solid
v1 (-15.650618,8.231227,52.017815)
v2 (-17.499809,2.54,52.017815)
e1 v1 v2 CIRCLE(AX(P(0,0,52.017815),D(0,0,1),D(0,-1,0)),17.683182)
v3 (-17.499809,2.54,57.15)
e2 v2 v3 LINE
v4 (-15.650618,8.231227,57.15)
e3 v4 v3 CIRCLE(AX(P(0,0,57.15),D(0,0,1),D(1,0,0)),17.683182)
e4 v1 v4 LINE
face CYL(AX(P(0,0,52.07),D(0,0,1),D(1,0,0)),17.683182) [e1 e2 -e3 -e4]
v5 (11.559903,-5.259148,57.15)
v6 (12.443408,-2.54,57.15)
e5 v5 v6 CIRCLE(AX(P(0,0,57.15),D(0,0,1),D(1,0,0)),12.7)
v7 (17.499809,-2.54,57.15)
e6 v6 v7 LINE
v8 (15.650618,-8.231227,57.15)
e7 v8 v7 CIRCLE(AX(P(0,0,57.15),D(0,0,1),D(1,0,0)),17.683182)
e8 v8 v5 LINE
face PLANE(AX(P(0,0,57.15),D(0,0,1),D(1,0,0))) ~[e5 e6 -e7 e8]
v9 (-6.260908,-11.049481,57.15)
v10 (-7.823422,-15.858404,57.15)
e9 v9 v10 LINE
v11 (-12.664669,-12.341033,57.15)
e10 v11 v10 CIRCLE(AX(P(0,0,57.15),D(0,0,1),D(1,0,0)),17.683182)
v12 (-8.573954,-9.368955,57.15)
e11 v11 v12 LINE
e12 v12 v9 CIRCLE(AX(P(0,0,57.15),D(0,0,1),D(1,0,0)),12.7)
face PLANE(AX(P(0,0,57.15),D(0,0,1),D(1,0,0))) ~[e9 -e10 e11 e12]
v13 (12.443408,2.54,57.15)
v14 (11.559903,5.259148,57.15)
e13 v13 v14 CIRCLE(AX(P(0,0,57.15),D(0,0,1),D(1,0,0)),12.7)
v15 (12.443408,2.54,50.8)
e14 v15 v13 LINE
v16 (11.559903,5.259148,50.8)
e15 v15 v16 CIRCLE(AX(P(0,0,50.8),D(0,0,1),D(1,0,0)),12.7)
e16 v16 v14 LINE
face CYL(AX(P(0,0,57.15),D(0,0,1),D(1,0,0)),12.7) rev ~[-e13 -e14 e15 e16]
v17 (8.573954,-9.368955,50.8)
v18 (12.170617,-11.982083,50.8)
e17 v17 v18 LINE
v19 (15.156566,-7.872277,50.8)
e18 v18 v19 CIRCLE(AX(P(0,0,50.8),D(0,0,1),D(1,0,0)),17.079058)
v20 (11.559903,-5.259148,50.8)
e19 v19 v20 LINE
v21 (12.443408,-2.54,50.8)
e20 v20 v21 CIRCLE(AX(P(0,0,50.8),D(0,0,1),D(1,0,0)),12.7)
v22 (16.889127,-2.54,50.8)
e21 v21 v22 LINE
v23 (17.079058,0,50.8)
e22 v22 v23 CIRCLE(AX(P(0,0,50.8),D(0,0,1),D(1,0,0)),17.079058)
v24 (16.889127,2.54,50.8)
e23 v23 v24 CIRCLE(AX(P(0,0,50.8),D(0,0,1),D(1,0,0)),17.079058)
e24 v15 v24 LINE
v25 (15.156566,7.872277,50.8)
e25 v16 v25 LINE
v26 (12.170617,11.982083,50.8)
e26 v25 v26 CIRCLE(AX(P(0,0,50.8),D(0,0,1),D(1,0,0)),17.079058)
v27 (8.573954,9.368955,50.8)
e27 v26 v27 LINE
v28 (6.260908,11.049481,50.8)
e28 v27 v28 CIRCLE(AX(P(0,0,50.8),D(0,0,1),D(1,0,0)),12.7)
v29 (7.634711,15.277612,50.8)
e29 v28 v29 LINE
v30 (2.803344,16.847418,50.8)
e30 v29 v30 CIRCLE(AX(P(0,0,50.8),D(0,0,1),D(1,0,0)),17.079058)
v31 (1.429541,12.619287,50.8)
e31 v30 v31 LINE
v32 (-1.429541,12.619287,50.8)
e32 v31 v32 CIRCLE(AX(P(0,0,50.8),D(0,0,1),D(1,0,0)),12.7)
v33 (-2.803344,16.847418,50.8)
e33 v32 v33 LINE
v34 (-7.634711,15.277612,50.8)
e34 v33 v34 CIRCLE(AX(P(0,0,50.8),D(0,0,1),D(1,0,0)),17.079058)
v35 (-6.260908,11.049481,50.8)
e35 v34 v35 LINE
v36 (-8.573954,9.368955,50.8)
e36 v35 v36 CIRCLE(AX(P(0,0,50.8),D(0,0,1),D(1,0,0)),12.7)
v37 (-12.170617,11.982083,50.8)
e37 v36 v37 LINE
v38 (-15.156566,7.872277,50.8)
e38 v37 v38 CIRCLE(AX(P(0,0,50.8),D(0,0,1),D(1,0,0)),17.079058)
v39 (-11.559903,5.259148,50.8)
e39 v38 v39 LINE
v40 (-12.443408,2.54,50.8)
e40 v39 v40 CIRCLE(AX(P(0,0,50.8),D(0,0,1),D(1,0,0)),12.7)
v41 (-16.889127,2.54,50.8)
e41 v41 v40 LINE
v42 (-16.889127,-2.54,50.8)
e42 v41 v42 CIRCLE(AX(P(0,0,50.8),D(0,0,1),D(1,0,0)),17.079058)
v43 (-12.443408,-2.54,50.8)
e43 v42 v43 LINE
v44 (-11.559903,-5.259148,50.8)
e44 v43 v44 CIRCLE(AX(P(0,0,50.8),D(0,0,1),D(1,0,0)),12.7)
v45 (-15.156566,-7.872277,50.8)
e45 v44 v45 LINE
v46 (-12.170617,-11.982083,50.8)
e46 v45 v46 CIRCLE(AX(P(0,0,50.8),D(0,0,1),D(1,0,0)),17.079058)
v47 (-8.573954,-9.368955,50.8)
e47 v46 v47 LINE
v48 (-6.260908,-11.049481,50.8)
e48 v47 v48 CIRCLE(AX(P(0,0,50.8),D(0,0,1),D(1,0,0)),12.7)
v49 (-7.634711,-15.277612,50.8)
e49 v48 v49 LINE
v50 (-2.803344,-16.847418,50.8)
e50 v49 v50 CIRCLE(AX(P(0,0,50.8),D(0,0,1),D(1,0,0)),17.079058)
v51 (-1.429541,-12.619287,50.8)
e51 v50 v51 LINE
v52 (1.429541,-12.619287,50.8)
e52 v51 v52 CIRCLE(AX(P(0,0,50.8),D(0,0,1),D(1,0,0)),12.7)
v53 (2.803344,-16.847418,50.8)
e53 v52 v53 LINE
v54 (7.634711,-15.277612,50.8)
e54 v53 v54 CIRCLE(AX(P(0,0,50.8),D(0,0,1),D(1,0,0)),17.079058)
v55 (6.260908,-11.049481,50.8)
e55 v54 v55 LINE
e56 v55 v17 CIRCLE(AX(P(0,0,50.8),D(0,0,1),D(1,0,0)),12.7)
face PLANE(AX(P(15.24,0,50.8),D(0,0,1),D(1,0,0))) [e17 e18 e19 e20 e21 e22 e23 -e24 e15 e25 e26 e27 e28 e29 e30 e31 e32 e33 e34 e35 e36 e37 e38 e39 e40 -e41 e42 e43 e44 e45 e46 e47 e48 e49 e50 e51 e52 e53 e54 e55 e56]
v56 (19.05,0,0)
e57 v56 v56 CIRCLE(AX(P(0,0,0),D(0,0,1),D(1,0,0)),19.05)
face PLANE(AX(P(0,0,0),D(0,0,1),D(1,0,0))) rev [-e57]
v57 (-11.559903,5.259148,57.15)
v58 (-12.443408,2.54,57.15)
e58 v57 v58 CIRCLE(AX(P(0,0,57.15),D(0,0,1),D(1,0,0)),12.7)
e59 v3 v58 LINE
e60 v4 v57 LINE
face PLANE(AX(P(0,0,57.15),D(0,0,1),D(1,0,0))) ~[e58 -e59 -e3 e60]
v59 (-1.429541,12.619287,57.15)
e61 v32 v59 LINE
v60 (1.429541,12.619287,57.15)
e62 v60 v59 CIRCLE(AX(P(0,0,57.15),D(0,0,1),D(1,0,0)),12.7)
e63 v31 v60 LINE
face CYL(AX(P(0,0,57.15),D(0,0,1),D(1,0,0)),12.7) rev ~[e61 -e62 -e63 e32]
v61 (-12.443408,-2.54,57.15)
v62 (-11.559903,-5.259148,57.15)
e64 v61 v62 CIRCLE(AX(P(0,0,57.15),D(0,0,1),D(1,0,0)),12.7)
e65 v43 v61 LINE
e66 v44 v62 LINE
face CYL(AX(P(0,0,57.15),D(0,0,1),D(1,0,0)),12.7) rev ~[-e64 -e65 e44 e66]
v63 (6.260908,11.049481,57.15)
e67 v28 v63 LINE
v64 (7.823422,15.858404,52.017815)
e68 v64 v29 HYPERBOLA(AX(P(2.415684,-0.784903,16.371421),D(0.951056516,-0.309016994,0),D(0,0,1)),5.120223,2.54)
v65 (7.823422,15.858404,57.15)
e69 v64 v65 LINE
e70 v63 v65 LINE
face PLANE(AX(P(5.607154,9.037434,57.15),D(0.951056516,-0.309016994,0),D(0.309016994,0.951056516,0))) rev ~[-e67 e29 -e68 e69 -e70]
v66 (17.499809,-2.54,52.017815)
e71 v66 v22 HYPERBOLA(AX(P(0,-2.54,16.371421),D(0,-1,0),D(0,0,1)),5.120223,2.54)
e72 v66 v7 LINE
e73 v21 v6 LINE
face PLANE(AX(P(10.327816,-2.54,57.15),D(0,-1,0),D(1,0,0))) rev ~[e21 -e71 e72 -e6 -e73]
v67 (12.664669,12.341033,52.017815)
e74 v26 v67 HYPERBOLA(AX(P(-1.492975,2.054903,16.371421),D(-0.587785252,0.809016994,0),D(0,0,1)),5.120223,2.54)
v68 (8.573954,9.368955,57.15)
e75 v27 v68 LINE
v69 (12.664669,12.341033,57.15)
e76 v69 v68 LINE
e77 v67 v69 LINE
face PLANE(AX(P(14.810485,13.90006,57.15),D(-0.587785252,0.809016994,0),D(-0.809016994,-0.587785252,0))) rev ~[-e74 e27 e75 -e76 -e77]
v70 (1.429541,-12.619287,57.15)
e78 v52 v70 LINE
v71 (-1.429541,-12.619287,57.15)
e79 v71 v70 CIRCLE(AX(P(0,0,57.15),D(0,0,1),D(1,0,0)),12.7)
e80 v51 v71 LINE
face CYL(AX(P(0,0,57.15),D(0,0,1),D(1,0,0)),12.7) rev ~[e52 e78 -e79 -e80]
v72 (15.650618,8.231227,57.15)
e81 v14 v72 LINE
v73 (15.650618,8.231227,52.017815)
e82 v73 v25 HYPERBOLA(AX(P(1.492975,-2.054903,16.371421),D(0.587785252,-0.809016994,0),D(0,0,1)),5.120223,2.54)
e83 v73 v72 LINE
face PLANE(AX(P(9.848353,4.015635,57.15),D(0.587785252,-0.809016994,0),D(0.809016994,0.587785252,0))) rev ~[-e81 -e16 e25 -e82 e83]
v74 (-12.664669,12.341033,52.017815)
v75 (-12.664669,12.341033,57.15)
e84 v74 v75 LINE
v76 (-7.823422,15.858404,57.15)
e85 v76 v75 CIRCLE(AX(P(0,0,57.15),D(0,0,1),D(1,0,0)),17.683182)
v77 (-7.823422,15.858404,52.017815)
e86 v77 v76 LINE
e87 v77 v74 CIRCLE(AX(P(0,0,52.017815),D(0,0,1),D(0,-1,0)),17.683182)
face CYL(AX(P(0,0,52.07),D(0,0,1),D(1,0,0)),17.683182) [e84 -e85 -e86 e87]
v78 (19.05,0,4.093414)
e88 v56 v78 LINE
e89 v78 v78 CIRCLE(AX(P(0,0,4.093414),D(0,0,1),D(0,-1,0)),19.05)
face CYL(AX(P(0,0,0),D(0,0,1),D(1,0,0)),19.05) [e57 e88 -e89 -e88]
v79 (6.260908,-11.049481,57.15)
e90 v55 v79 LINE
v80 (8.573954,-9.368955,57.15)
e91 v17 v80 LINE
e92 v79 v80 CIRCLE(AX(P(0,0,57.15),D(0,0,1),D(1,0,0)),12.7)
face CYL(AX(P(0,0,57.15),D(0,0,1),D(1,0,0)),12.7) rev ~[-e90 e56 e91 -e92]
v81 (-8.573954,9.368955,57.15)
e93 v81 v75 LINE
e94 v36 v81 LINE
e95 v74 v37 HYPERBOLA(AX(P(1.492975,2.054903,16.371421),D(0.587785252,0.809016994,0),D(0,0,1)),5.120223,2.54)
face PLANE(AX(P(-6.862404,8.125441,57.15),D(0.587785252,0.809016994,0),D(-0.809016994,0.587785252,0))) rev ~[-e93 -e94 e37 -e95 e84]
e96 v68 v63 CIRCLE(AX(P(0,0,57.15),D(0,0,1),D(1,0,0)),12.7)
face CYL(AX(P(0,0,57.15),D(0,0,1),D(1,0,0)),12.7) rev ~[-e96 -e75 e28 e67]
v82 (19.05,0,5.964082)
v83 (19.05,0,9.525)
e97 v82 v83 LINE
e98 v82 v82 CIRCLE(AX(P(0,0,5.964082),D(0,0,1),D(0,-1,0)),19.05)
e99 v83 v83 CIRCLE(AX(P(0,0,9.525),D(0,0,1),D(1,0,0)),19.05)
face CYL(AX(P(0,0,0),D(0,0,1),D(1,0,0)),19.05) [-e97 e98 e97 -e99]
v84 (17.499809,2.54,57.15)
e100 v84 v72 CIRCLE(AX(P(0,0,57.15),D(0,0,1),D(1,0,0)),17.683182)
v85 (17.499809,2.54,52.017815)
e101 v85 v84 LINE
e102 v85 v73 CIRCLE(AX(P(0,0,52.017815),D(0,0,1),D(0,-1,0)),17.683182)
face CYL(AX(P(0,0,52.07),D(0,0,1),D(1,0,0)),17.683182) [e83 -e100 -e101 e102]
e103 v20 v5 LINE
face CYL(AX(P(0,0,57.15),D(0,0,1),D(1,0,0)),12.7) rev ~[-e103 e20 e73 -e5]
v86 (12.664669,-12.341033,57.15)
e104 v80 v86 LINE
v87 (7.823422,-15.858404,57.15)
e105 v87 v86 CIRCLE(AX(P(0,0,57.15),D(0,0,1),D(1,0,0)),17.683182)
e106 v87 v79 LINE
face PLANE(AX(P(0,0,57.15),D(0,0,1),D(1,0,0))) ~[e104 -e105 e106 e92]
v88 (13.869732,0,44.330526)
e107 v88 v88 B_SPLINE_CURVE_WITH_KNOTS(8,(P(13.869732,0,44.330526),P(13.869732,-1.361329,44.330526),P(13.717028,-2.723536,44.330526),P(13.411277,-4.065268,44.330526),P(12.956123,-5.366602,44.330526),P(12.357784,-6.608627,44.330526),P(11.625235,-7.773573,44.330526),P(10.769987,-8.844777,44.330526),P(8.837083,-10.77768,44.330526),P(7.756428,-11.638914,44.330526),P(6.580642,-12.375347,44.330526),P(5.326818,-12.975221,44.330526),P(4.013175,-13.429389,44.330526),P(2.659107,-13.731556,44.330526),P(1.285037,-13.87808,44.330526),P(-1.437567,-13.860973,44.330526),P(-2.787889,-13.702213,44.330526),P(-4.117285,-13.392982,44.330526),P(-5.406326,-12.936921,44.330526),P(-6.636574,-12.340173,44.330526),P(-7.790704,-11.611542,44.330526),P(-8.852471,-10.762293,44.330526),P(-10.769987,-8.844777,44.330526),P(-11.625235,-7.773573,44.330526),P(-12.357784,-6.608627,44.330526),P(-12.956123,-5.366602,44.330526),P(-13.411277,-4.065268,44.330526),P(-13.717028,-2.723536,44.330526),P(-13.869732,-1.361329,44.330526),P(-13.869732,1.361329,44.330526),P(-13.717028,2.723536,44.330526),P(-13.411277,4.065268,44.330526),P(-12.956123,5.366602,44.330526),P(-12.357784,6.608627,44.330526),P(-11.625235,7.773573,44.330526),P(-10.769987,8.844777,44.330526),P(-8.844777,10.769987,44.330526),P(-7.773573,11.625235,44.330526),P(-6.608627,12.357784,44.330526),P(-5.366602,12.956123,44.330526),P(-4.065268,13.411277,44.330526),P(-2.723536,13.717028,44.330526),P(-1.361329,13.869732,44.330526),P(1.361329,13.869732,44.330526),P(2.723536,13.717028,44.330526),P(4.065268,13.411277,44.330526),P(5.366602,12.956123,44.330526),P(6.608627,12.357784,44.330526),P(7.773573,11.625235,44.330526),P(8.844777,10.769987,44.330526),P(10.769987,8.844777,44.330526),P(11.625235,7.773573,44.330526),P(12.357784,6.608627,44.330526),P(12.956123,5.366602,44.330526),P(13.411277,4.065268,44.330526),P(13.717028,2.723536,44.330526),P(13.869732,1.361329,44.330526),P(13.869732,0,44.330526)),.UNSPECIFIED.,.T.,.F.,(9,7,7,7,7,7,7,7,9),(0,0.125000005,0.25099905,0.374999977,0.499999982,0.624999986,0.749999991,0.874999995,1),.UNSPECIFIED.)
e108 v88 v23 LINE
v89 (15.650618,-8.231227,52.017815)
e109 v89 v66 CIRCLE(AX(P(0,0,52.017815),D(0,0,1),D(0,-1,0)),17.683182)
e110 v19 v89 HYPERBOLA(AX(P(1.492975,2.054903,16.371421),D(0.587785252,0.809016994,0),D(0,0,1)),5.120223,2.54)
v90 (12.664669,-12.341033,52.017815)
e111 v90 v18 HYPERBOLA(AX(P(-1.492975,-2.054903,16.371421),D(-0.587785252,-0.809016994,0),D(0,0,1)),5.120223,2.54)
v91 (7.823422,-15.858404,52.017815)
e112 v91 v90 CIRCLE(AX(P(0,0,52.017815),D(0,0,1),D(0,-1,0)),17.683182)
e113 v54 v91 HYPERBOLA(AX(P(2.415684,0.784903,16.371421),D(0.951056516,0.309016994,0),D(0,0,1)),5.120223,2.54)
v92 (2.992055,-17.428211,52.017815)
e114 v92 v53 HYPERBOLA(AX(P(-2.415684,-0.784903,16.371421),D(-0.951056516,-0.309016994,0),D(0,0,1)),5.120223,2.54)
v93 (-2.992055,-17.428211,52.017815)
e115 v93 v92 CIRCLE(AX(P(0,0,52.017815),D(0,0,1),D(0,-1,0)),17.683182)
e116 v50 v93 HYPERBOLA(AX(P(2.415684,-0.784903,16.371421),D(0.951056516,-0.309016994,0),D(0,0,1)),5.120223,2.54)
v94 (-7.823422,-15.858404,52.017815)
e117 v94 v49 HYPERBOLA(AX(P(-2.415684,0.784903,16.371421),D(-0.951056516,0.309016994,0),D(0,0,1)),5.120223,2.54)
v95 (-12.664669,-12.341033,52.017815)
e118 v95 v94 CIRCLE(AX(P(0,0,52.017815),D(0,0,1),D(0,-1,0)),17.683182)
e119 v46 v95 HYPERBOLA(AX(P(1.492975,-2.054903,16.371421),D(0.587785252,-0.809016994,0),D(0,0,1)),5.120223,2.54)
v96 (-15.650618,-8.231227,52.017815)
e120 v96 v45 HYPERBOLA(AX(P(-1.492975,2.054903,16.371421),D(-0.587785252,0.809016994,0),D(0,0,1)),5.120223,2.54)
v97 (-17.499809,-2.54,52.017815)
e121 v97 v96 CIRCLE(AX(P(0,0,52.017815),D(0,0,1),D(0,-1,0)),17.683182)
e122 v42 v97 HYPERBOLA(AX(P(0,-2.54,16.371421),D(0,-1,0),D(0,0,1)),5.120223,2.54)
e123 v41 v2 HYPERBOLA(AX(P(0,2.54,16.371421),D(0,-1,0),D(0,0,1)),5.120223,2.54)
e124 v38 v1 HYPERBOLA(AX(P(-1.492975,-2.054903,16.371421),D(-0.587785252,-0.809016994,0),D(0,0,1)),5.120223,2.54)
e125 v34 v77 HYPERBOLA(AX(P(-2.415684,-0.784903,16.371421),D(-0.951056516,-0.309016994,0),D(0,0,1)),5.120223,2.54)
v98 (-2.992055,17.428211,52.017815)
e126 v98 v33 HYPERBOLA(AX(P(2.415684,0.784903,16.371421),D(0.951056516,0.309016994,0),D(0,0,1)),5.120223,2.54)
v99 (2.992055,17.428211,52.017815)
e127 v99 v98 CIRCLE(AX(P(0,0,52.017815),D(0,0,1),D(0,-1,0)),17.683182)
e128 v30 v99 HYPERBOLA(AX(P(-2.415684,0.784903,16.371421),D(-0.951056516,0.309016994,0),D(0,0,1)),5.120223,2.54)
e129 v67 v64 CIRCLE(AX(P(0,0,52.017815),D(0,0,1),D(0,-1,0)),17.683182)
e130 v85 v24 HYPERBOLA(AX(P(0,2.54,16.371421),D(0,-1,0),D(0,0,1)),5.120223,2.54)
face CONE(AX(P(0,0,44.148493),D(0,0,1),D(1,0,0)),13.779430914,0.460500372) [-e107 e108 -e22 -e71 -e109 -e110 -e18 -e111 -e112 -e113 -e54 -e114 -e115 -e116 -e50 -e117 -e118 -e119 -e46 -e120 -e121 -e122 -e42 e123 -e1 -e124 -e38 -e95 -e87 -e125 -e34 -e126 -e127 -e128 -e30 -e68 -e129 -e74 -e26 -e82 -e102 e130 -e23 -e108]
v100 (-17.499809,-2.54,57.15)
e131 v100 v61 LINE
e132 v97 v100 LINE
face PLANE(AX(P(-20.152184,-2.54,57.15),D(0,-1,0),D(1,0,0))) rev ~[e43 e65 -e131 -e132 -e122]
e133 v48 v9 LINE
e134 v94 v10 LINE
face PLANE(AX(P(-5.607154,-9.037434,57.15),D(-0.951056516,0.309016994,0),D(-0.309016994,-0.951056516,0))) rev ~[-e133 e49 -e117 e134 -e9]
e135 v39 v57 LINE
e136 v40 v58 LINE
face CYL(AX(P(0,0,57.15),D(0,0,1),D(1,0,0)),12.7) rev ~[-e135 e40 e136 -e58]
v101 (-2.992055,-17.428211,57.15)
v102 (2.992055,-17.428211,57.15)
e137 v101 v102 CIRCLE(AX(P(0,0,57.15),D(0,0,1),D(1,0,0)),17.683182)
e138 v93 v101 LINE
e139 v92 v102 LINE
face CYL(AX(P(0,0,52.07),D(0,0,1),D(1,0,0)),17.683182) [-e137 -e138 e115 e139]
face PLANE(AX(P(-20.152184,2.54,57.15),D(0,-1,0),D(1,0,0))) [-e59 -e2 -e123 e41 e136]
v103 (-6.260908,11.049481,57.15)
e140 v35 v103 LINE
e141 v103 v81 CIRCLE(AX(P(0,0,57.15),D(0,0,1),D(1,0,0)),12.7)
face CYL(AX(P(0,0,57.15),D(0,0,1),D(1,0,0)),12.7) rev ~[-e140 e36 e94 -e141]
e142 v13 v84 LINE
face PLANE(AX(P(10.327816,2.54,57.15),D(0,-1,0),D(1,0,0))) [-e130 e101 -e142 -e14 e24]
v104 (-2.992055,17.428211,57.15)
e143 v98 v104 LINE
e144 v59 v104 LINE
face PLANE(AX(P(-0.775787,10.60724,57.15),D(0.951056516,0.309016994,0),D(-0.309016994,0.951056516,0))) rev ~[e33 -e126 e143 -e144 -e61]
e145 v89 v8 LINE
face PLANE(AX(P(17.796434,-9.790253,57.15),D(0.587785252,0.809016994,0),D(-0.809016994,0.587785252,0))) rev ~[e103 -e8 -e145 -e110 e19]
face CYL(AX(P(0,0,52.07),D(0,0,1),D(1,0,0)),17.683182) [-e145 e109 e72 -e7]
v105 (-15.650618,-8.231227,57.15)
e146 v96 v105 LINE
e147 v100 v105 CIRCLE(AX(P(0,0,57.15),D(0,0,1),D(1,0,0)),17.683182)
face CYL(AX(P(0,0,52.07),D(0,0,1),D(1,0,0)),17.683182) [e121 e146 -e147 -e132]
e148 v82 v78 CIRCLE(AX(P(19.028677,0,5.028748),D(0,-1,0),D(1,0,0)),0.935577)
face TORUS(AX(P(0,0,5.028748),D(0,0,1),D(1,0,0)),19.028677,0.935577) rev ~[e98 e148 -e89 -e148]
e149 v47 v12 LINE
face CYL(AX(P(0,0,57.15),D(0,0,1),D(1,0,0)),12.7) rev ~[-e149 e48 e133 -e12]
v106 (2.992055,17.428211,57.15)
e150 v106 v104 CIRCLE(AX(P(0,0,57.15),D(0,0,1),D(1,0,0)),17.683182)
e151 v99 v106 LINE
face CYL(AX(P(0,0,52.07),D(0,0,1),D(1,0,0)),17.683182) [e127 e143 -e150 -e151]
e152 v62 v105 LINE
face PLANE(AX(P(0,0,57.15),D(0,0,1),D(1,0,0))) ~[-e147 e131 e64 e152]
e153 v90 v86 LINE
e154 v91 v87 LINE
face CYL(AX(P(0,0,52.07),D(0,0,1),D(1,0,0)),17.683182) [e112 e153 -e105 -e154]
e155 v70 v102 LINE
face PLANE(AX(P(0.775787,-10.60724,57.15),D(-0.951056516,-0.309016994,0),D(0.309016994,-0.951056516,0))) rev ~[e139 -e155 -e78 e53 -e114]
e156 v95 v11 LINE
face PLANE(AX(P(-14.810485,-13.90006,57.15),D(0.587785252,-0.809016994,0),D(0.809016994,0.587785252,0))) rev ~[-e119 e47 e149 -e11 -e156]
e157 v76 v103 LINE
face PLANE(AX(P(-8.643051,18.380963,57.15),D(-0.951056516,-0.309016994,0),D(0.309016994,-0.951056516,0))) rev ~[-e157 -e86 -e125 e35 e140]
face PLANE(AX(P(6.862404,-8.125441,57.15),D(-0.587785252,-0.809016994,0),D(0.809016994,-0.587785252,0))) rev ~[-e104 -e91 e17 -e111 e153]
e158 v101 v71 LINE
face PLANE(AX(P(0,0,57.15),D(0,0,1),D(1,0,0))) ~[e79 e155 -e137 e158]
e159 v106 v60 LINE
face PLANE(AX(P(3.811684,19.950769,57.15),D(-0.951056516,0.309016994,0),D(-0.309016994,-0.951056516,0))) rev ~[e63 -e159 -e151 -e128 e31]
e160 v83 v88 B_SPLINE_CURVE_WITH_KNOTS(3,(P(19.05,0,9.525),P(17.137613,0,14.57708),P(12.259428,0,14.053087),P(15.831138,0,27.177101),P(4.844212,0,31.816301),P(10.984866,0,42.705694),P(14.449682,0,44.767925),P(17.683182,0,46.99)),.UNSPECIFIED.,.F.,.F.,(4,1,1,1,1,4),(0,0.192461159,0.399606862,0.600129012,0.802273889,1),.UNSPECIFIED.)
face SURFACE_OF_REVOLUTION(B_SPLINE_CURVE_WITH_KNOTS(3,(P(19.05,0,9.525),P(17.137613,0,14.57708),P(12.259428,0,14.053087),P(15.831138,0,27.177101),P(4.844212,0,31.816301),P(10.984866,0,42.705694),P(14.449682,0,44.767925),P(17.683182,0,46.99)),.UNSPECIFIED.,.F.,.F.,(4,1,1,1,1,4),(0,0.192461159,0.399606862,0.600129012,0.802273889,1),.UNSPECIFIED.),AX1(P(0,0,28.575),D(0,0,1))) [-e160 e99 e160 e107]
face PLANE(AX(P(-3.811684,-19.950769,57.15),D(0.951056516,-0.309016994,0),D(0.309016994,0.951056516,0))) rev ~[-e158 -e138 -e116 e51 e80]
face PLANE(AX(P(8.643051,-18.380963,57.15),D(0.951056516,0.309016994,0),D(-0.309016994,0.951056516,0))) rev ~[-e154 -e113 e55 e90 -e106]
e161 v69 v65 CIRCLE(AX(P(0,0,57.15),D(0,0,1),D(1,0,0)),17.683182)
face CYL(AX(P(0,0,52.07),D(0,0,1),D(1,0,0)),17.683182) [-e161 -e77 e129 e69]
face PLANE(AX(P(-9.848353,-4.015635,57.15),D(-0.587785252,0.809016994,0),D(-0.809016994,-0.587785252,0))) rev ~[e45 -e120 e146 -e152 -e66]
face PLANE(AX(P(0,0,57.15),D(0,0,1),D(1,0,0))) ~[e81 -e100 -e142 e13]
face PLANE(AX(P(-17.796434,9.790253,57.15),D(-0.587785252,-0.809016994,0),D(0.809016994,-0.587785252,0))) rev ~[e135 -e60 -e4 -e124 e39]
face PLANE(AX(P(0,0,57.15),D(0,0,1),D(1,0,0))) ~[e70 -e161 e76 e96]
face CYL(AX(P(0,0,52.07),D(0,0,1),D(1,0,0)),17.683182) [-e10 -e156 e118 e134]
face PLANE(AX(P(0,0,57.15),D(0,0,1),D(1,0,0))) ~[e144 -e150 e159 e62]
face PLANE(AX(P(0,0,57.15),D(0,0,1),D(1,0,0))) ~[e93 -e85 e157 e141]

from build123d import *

# Parameters (mm, degrees)
F0_W     = 17.6831819117
F0_H     = 10.16
F2_R     = 12.7
F3_DEPTH = 6.35
F4_W     = 9.8243676867
F4_H     = 5.08
F5_DEPTH = 6.35
F7_R     = 0.9355774764


# Not quite as in the source:
# - a fillet or chamfer that OpenCascade refuses, or shapes differently, is made with other operations: its cross-section is extruded or revolved along the edge and cut away or added


with BuildPart() as f1:
    # F0 (on Front) → F1 (revolve)
    with BuildSketch(Plane.XZ):
        with Locations((8.8415909559, 52.07)):
            Rectangle(F0_W, F0_H)
        with BuildLine():
            Line((0, 46.99), (0, 0))
            Line((0, 0), (19.05, 0))
            Line((19.05, 0), (19.05, 9.525))
            add(Edge.make_bspline(
                [(19.05, 9.525), (17.1376126861, 14.5770803043), (12.2594277566, 14.0530870359), (15.8311377158, 27.1771005404), (4.8442118801, 31.8163009505), (10.984866263, 42.7056935759), (14.4496818428, 44.7679251006), (17.6831819117, 46.99)],
                knots=[0, 0, 0, 0, 0.192461159, 0.3996068615, 0.6001290124, 0.8022738887, 1, 1, 1, 1], degree=3))
            Line((17.6831819117, 46.99), (0, 46.99))
        make_face()
    revolve(axis=Axis((0, 0, 28.575), (0, 0, 1)))

    # F2 (on face) → F3 (cut)
    with BuildSketch(Plane.XY.offset(57.15)):
        Circle(F2_R)
    extrude(amount=-F3_DEPTH, mode=Mode.SUBTRACT)

    # F4 (on face) → F5 (cut)
    with BuildSketch(Plane.XY.offset(57.15)):
        with Locations((15.24, 0)):
            Rectangle(F4_W, F4_H)
        Polygon((6.8624042447, 8.125441191), (9.8483533263, 4.0156348596), (17.7964337439, 9.7902532989), (14.8104846622, 13.9000596303), align=None)
        Polygon((0.7757871558, 10.6072400206), (5.6071542586, 9.0374336892), (8.6430508328, 18.3809625961), (3.81168373, 19.9507689275), align=None)
        Polygon((-5.6071542586, 9.0374336892), (-0.7757871558, 10.6072400206), (-3.81168373, 19.9507689275), (-8.6430508328, 18.3809625961), align=None)
        Polygon((-9.8483533263, 4.0156348596), (-6.8624042447, 8.125441191), (-14.8104846622, 13.9000596303), (-17.7964337439, 9.7902532989), align=None)
        with Locations((-15.24, 0)):
            Rectangle(F4_W, F4_H)
        Polygon((-6.8624042447, -8.125441191), (-9.8483533263, -4.0156348596), (-17.7964337439, -9.7902532989), (-14.8104846622, -13.9000596303), align=None)
        Polygon((-0.7757871558, -10.6072400206), (-5.6071542586, -9.0374336892), (-8.6430508328, -18.3809625961), (-3.81168373, -19.9507689275), align=None)
        Polygon((5.6071542586, -9.0374336892), (0.7757871558, -10.6072400206), (3.81168373, -19.9507689275), (8.6430508328, -18.3809625961), align=None)
        Polygon((9.8483533263, -4.0156348596), (6.8624042447, -8.125441191), (14.8104846622, -13.9000596303), (17.7964337439, -9.7902532989), align=None)
    extrude(amount=-F5_DEPTH, mode=Mode.SUBTRACT)

    # F6: chamfer of 5.08 on 1 edges, made by hand

    # F6_s1 → F6_t2 (revolve, cut)
    with BuildSketch(Plane.XZ):
        with BuildLine():
            Line((13.7794309142, 44.1484930415), (17.7734832624, 52.1998472193))
            Line((17.7734832624, 52.1998472193), (17.8750832624, 52.1998472193))
            ThreePointArc((17.8750832624, 52.1998472193), (17.7847819117, 49.5949236096), (17.7847819117, 46.99))
            Line((17.7847819117, 46.99), (17.7407244212, 46.90626578))
            ThreePointArc((17.7407244212, 46.90626578), (15.7475972656, 45.5454980697), (13.8409013181, 44.0675983603))
            Line((13.8409013181, 44.0675983603), (13.7794309142, 44.1484930415))
        make_face()
    revolve(axis=Axis((0, 0, 46.99), (0, 0, 1)), mode=Mode.SUBTRACT)

    # F7 (on Front) → F8 (revolve, cut)
    with BuildSketch(Plane.XZ):
        with Locations((19.0286766738, 5.0287479535)):
            Circle(F7_R)
    revolve(axis=Axis((0, 0, 5.0287479535), (0, 0, 1)), mode=Mode.SUBTRACT)


solid = f1.part
